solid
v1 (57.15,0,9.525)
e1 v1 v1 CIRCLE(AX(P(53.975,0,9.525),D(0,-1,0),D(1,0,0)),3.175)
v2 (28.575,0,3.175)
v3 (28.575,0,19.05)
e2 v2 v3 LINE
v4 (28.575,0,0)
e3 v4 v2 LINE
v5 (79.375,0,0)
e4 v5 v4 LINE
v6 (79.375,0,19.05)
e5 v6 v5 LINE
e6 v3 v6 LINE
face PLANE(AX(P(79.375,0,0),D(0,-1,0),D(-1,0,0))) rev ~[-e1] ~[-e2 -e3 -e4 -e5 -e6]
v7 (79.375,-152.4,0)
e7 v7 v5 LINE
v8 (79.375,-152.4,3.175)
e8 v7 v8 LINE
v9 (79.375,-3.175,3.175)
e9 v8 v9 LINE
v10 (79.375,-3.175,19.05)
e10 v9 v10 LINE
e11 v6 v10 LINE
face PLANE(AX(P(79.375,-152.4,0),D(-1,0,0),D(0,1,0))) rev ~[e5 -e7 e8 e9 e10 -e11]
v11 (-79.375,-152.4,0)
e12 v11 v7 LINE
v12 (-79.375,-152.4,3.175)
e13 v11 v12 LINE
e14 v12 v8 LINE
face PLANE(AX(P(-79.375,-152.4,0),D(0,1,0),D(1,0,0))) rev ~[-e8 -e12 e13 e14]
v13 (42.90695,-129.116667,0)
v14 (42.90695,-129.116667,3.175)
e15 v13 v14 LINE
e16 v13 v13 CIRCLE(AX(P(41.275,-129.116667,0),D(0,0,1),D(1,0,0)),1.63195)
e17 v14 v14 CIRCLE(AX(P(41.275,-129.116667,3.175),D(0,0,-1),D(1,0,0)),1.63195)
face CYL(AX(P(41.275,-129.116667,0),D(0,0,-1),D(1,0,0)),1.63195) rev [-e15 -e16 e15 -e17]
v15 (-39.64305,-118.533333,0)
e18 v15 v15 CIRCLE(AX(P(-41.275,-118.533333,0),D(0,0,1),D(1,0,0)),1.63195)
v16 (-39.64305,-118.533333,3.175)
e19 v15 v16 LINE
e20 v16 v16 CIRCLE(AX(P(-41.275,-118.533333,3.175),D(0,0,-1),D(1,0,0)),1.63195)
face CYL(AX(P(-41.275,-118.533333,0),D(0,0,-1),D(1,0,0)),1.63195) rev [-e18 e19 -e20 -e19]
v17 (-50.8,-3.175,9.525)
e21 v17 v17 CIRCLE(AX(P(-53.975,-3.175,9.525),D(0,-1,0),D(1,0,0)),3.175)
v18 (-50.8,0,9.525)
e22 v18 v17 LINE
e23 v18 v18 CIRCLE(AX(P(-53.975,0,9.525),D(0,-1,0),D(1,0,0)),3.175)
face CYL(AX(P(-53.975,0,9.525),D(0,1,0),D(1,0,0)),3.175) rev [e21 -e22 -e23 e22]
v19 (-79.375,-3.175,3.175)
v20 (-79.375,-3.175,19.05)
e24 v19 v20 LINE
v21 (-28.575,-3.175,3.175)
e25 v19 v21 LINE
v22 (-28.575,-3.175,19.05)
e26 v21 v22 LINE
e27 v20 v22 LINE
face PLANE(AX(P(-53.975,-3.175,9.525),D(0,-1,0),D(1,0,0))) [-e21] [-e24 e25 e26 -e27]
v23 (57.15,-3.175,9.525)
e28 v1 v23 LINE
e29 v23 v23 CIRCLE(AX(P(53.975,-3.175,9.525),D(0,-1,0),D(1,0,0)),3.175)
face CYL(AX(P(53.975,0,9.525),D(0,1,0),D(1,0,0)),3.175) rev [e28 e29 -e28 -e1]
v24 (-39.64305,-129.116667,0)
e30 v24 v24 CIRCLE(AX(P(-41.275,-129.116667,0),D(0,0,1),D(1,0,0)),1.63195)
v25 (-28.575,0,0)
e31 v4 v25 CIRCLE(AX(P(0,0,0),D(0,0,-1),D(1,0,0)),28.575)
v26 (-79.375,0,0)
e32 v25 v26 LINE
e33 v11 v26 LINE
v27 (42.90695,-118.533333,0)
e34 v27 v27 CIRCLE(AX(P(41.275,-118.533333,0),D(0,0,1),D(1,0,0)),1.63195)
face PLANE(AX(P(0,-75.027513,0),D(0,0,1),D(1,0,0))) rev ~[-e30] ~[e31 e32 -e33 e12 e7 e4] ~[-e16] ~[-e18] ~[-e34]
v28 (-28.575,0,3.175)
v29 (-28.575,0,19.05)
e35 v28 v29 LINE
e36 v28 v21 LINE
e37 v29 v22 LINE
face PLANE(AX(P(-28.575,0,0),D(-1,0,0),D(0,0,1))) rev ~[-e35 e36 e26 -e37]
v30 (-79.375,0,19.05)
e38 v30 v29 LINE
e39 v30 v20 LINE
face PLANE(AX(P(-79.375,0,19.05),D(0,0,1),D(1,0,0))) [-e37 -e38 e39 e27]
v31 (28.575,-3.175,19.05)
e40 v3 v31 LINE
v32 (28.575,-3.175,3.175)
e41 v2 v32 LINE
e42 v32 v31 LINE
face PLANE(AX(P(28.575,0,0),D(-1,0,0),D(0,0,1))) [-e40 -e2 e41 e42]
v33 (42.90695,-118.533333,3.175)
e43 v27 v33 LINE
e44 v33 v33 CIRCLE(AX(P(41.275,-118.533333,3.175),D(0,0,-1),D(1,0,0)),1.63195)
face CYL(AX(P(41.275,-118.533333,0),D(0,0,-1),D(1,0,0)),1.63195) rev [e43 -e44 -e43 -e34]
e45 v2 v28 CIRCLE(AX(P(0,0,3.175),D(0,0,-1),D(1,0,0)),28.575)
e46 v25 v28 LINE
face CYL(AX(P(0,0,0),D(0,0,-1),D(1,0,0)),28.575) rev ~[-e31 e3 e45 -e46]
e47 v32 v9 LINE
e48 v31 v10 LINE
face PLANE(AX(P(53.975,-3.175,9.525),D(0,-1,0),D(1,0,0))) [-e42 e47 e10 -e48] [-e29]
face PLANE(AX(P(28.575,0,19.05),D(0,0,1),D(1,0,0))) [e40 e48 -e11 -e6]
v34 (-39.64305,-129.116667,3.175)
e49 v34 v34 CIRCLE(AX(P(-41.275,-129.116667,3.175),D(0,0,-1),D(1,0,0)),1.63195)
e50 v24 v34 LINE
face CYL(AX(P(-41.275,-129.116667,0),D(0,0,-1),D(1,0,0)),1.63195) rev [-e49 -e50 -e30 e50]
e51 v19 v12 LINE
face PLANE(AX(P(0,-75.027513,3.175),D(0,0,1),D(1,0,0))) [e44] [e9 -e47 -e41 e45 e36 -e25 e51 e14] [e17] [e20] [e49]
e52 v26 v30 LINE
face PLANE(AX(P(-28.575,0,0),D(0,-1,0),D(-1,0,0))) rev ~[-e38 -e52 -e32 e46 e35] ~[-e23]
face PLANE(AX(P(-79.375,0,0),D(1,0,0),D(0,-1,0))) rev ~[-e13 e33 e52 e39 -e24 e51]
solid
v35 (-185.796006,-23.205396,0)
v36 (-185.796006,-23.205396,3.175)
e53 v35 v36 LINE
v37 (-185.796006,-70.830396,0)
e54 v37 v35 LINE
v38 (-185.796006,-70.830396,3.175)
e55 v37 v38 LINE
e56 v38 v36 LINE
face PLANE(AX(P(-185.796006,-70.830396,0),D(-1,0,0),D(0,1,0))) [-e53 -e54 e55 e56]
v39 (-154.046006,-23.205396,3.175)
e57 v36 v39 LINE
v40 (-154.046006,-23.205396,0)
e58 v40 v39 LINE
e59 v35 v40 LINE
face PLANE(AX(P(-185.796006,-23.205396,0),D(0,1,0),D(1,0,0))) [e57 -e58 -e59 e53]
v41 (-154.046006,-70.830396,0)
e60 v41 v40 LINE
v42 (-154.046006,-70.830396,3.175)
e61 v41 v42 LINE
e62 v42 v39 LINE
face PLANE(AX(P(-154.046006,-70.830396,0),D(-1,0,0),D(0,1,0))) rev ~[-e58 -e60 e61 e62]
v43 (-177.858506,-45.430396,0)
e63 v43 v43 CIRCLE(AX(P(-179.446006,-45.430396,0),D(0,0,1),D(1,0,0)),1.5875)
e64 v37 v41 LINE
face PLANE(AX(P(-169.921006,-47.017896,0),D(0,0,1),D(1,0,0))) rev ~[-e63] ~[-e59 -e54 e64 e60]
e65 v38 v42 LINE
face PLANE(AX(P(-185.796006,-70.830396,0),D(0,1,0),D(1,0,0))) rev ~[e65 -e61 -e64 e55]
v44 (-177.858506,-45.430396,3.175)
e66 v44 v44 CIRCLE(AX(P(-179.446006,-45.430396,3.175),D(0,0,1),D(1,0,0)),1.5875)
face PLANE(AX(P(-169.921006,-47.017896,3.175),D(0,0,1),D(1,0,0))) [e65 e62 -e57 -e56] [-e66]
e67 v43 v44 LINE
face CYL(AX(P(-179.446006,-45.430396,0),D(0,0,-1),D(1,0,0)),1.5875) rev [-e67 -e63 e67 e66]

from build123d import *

# Parameters (mm, degrees)
F2_DEPTH = 3.175
F1_W     = 50.8
F1_H     = 19.05
F1_R     = 3.175
F3_DEPTH = 3.175
F5_W     = 31.75
F5_H     = 47.625
F5_R     = 1.5875
F6_DEPTH = 3.175
F7_R     = 1.63195
F8_DEPTH = 39.37


# Not quite as in the source:
# - a feature names something its author has since deleted; it is built from what else it names


with BuildPart() as f2:
    # F0 (on Top) → F2 (new body)
    with BuildSketch(Plane.XY):
        with BuildLine():
            Line((-28.575, 0), (-79.375, 0))
            Line((-79.375, 0), (-79.375, -152.4))
            Line((-79.375, -152.4), (79.375, -152.4))
            Line((79.375, -152.4), (79.375, 0))
            Line((79.375, 0), (28.575, 0))
            ThreePointArc((28.575, 0), (0, -28.575), (-28.575, 0))
        make_face()
    extrude(amount=F2_DEPTH)

    # F1 (on Front) → F3 (join)
    with BuildSketch(Plane.XZ):
        with Locations((53.975, 9.525)):
            Rectangle(F1_W, F1_H)
        with Locations((53.975, 9.525)):
            Circle(F1_R, mode=Mode.SUBTRACT)
        with Locations((-53.975, 9.525)):
            Rectangle(F1_W, F1_H)
        with Locations((-53.975, 9.525)):
            Circle(F1_R, mode=Mode.SUBTRACT)
    extrude(amount=F3_DEPTH)

    # F7 (on Top) → F8 (cut)
    with BuildSketch(Plane.XY):
        with Locations((-41.275, -118.5333333333)):
            Circle(F7_R)
        with Locations((-41.275, -129.1166666667)):
            Circle(F7_R)
        with Locations((41.275, -118.5333333333)):
            Circle(F7_R)
        with Locations((41.275, -129.1166666667)):
            Circle(F7_R)
    extrude(amount=F8_DEPTH, mode=Mode.SUBTRACT)


with BuildPart() as f6:
    # F5 (on Top) → F6 (new body)
    with BuildSketch(Plane.XY):
        with Locations((-169.9210062872, -47.0178964723)):
            Rectangle(F5_W, F5_H)
        with Locations((-179.4460062872, -45.4303964723)):
            Circle(F5_R, mode=Mode.SUBTRACT)
    extrude(amount=F6_DEPTH)


solid = Compound([f2.part, f6.part])
